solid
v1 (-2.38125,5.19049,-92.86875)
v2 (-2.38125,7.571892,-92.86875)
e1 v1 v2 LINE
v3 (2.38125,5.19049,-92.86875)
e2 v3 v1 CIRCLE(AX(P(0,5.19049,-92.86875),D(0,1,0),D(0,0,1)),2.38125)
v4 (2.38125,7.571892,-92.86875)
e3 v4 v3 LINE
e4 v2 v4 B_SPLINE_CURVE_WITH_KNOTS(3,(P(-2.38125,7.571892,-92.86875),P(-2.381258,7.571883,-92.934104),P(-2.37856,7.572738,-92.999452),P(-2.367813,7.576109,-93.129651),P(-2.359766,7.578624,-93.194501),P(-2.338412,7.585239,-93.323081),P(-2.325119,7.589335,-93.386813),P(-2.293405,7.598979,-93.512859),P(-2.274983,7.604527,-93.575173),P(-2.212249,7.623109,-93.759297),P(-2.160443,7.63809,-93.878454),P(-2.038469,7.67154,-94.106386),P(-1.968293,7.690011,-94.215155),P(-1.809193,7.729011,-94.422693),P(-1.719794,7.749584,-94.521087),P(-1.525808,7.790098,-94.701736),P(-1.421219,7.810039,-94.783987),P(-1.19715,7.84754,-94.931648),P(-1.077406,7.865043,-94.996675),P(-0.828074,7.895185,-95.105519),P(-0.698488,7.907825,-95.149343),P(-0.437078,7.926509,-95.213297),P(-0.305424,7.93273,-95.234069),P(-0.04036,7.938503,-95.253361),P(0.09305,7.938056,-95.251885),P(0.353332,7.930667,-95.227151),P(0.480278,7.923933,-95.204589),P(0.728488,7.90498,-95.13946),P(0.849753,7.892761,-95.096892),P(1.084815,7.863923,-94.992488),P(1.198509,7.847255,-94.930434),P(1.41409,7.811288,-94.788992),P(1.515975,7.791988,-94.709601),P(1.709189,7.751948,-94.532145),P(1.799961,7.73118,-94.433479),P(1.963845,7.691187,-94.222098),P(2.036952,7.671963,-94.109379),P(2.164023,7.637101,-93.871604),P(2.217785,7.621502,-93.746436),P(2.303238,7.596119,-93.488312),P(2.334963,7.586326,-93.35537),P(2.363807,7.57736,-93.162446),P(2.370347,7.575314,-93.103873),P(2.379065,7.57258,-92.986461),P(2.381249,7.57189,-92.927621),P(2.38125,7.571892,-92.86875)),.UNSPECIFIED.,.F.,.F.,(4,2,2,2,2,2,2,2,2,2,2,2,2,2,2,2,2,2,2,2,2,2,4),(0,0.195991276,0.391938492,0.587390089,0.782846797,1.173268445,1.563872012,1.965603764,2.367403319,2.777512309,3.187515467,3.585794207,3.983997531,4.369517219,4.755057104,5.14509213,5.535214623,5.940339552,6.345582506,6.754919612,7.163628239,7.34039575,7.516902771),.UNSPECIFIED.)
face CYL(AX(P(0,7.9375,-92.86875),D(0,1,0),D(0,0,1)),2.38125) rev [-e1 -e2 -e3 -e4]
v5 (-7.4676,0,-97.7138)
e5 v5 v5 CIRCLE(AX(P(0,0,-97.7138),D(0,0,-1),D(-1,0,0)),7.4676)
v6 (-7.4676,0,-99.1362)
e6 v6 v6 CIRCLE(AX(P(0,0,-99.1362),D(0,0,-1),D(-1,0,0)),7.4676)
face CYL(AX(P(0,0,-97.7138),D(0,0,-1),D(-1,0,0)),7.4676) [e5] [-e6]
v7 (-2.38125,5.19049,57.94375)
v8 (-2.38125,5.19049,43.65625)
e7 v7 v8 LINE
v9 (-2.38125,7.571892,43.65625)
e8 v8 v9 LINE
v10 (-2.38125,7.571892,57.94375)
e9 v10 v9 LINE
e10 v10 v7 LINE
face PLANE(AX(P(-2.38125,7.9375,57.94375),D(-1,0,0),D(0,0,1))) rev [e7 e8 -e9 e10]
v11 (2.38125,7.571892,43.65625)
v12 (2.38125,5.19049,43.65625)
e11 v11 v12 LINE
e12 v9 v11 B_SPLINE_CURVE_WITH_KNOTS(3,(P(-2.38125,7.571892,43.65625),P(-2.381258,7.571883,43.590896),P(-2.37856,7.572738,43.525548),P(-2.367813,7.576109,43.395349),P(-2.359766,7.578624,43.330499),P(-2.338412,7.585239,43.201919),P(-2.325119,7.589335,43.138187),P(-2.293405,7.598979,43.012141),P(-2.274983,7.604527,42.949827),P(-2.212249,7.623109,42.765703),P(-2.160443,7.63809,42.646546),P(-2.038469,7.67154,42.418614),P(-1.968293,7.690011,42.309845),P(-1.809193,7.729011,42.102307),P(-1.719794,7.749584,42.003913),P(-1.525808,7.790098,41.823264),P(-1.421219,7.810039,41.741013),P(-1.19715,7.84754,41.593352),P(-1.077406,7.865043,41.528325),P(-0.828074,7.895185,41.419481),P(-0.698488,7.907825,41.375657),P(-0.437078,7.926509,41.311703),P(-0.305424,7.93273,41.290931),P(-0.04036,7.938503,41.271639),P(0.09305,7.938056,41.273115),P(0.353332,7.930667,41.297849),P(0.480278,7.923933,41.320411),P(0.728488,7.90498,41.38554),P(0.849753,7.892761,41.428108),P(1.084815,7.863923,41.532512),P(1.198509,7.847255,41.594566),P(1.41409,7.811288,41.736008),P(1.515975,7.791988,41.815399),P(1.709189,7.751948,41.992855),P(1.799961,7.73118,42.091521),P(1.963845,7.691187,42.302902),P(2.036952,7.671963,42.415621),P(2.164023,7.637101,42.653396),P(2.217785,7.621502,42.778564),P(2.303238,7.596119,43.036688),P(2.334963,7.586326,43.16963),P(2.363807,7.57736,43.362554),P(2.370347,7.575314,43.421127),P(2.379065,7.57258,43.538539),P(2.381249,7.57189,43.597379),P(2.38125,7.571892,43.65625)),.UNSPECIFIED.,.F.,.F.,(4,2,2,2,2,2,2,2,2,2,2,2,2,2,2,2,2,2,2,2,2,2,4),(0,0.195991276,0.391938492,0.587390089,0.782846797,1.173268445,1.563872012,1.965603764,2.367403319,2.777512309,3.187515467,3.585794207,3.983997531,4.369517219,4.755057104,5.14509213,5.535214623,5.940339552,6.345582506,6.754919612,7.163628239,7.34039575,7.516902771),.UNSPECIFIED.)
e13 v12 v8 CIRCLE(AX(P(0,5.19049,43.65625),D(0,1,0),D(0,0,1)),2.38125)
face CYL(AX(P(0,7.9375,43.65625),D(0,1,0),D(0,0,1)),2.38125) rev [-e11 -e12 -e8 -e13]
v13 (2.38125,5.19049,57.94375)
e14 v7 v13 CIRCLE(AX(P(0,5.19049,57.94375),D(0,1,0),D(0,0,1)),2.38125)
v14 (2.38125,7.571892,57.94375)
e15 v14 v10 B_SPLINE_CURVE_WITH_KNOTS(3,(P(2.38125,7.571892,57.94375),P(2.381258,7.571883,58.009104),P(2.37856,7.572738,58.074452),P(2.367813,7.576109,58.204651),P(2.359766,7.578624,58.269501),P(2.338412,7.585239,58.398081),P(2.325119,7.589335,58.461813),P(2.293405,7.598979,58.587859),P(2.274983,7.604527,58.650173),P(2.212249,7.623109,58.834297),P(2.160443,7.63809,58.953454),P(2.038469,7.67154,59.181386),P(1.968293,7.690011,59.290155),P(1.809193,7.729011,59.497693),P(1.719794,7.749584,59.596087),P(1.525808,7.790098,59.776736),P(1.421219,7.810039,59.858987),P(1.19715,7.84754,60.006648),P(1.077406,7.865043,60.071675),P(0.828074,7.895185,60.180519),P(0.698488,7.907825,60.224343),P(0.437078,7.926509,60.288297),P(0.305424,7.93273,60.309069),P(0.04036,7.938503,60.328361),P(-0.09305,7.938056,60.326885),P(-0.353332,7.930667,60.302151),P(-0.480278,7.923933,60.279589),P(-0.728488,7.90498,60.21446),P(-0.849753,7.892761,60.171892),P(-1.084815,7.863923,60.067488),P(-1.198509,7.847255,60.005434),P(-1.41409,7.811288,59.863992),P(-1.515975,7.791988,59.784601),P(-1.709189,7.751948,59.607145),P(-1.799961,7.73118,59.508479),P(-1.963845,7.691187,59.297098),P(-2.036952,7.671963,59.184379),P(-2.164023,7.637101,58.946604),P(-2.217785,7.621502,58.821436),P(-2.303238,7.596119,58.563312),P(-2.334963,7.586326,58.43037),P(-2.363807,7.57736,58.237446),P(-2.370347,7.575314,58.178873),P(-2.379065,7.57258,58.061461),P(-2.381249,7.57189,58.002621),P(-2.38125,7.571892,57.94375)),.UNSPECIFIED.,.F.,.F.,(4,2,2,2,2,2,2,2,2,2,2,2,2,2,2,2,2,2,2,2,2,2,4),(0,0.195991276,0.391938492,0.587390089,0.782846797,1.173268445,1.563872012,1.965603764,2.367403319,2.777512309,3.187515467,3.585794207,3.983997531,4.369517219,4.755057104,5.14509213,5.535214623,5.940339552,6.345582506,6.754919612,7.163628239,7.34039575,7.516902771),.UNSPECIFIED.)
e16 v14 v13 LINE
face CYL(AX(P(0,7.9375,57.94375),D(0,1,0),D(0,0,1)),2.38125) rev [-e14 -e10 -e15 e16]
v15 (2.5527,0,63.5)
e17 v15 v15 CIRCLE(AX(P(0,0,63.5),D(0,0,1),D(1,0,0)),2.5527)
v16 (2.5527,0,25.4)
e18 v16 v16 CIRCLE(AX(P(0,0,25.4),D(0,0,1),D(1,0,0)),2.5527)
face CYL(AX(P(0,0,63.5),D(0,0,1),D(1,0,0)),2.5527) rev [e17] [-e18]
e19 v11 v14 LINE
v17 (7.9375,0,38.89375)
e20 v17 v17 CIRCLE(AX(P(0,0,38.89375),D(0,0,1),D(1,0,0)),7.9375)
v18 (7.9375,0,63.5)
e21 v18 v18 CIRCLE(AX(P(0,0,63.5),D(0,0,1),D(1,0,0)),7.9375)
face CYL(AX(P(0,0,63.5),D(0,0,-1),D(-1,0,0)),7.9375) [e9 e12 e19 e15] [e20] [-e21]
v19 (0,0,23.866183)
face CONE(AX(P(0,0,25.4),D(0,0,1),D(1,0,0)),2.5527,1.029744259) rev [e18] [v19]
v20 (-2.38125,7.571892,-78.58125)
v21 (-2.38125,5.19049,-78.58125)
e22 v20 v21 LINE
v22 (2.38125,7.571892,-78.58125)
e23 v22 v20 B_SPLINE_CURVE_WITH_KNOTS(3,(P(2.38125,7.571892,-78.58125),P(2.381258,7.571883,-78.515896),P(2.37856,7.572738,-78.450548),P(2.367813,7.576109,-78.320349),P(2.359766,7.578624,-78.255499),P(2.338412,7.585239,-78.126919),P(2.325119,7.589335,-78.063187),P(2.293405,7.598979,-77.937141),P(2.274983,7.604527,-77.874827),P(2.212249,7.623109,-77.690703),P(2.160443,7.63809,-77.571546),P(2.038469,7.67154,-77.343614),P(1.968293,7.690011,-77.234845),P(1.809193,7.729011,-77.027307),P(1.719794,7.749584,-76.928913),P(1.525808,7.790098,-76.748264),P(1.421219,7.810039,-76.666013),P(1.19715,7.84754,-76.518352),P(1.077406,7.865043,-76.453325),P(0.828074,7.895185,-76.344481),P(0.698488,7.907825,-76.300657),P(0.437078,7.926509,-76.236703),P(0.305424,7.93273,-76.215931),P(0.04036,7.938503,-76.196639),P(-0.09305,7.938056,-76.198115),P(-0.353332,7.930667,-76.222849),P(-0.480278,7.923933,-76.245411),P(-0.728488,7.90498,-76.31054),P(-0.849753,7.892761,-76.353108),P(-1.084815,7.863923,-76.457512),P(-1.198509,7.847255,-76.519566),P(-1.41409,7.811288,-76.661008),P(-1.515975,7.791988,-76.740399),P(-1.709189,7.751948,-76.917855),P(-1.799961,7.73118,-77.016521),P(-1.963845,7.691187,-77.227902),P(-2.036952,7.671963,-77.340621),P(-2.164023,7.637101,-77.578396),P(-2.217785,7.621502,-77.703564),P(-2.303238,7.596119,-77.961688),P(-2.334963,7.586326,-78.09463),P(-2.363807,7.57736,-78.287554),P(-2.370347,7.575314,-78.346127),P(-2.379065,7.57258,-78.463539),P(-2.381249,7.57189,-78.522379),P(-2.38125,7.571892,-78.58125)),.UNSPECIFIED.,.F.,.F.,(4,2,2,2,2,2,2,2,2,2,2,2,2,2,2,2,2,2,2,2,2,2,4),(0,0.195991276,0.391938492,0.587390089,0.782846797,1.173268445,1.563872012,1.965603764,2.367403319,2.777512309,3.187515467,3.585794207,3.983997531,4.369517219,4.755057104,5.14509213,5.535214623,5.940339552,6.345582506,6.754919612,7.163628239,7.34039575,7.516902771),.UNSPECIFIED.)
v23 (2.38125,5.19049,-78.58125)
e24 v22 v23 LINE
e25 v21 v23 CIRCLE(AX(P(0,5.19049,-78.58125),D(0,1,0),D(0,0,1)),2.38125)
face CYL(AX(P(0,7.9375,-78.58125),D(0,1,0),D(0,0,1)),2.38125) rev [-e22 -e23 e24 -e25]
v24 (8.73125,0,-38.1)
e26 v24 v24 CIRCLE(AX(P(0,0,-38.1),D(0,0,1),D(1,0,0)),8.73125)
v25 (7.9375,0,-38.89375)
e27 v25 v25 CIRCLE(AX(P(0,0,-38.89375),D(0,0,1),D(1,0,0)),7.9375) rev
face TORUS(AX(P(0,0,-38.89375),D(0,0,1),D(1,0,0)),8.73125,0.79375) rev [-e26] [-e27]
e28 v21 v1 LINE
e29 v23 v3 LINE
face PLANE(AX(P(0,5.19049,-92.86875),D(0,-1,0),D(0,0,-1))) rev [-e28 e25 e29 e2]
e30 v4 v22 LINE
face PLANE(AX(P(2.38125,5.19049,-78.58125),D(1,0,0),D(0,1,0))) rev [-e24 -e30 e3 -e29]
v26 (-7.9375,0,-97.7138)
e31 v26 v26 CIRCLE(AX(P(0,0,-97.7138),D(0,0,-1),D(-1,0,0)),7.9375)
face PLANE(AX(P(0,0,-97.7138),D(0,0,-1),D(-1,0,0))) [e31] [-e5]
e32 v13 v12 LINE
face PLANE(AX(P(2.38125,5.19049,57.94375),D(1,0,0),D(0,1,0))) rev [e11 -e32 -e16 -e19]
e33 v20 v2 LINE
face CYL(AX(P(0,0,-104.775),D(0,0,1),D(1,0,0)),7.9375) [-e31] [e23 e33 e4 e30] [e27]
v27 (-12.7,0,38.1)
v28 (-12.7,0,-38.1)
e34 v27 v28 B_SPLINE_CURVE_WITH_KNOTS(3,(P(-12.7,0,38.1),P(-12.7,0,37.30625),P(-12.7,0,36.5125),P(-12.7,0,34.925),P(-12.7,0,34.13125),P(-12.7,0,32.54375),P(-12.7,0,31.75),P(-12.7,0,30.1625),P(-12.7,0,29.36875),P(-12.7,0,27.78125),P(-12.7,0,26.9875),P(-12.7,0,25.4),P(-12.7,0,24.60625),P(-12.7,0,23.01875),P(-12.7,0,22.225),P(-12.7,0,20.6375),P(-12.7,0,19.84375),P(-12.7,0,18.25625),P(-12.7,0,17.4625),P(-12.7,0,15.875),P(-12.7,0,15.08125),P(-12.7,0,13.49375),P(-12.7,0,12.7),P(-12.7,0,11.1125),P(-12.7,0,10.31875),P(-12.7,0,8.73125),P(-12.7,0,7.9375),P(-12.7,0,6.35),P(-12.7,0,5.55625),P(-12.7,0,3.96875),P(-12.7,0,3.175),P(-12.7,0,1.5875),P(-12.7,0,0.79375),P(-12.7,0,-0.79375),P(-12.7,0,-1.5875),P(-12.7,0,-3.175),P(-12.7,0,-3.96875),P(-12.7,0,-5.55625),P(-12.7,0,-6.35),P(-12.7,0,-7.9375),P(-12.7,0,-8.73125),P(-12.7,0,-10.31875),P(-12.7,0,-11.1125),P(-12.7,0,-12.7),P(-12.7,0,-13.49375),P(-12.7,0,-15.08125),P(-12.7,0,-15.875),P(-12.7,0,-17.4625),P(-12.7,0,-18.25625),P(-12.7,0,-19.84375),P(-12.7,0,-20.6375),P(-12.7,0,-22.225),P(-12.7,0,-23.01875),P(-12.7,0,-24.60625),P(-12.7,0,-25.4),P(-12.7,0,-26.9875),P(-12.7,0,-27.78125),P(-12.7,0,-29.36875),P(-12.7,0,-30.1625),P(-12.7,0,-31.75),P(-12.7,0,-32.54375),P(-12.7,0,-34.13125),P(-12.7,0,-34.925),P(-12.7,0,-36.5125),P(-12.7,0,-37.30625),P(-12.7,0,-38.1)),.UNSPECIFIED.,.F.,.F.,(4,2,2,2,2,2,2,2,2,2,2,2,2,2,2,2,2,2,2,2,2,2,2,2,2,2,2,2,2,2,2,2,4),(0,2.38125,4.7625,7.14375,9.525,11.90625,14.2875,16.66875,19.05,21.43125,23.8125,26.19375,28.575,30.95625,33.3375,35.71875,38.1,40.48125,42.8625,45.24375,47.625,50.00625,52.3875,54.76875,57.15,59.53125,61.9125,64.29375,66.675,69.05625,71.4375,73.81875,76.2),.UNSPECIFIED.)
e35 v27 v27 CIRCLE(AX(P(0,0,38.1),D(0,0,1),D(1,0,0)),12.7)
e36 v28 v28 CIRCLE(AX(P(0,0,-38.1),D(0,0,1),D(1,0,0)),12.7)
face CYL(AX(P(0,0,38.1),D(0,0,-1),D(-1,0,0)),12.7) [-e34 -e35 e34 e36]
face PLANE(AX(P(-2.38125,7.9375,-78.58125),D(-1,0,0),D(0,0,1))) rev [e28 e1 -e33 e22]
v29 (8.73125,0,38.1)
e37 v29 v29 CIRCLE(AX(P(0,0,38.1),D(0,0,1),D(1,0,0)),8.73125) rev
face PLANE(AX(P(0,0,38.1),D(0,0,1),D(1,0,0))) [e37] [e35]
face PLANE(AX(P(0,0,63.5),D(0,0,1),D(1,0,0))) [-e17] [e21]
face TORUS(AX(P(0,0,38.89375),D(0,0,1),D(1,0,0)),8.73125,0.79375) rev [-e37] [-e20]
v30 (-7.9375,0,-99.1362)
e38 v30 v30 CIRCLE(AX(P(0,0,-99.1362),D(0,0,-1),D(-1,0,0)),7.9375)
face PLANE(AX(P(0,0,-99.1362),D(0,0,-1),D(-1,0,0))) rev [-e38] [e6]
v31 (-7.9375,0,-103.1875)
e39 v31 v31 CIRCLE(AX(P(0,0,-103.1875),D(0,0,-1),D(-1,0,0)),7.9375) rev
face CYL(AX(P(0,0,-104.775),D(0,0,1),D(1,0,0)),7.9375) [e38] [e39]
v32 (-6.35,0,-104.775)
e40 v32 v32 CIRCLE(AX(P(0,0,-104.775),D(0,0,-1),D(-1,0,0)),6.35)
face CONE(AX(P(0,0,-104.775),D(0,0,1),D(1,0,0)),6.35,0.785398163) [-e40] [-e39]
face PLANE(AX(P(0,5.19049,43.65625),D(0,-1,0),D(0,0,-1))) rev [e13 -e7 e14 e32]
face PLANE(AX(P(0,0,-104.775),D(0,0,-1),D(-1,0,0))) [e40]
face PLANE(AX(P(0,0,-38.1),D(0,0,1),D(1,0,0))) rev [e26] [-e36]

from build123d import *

# Parameters (mm, degrees)
SKETCH1_R                          = 12.7
BOSS_EXTRUDE1_DEPTH                = 38.1
SKETCH3_R                          = 7.9375
BOSS_EXTRUDE2_DEPTH                = 66.675
SKETCH8_R                          = 12.7
SKETCH8_R_2                        = 7.4676
CUT_EXTRUDE1_DEPTH                 = 0.7112
BOSS_EXTRUDE3_START                = 25.4
SKETCH9_R                          = 7.9375
BOSS_EXTRUDE3_DEPTH                = 25.4
FILLET1_R                          = 0.79375
F_1_4_20_TAPPED_HOLE1_D            = 5.1054
F_1_4_20_TAPPED_HOLE1_DEPTH        = 38.1
F_1_4_20_TAPPED_HOLE1_TIP          = 1.533816902
F_3_16_START                       = 5.19049
F_3_16_0_1875_DIAMETER_SLOT1_DEPTH = 3.80951
CHAMFER1_SIZE                      = 1.5875


with BuildPart() as part:
    # Sketch1 → Boss-Extrude1 (new, symmetric)
    with BuildSketch(Plane.XY):
        with Locations(Location((0, 0, 0), (0, 0, 180))):
            Circle(SKETCH1_R)
    extrude(amount=BOSS_EXTRUDE1_DEPTH, both=True)

    # Sketch3 → Boss-Extrude2 (add)
    with BuildSketch(Plane(origin=(0, 0, -38.1), x_dir=(-1, 0, 0), z_dir=(0, 0, -1))):
        with Locations(Location((0, 0, 0), (0, 0, 180))):
            Circle(SKETCH3_R)
    extrude(amount=BOSS_EXTRUDE2_DEPTH)

    # Sketch8 → Cut-Extrude1 (cut, symmetric)
    with BuildSketch(Plane(origin=(0, 0, -98.425), x_dir=(-1, 0, 0), z_dir=(0, 0, -1))):
        Circle(SKETCH8_R)
        Circle(SKETCH8_R_2, mode=Mode.SUBTRACT)
    extrude(amount=CUT_EXTRUDE1_DEPTH, both=True, mode=Mode.SUBTRACT)

    # Sketch9 → Boss-Extrude3 (add)
    with BuildSketch(Plane.XY.offset(38.1).offset(BOSS_EXTRUDE3_START)):
        Circle(SKETCH9_R)
    extrude(amount=-BOSS_EXTRUDE3_DEPTH)

    # Fillet1
    fillet1_edges = [part.edges().sort_by_distance(p)[0] for p in [
        (-7.9375, 0, 38.1),
        (-7.9375, 0, -38.1),
    ]]
    fillet(fillet1_edges, radius=FILLET1_R)

    # 1/4-20 Tapped Hole1
    with Locations(Plane.XY.offset(63.5)):
        with Locations((0, 0)):
            Hole(F_1_4_20_TAPPED_HOLE1_D / 2, depth=F_1_4_20_TAPPED_HOLE1_DEPTH)
            with Locations((0, 0, -(F_1_4_20_TAPPED_HOLE1_DEPTH + F_1_4_20_TAPPED_HOLE1_TIP / 2))):  # 118° drill point
                Cone(0, F_1_4_20_TAPPED_HOLE1_D / 2, F_1_4_20_TAPPED_HOLE1_TIP, mode=Mode.SUBTRACT)

    # 3/16 (0.1875) Diameter Slot1: read off the stored shape, not the designer's step
    # 3/16 (0.1875) Diameter Slot1 outline → 3/16 (0.1875) Diameter Slot1 (cut)
    with BuildSketch(Plane(origin=(0, 0, 0), x_dir=(1, 0, 0), z_dir=(0, 1, 0)).offset(F_3_16_START)):
        with BuildLine():
            ThreePointArc((2.38125, -43.65625), (0, -41.275), (-2.38125, -43.65625))
            Line((-2.38125, -43.65625), (-2.38125, -57.94375))
            ThreePointArc((-2.38125, -57.94375), (0, -60.325), (2.38125, -57.94375))
            Line((2.38125, -57.94375), (2.38125, -43.65625))
        make_face()
        with BuildLine():
            ThreePointArc((2.38125, 92.86875), (0, 95.25), (-2.38125, 92.86875))
            Line((-2.38125, 92.86875), (-2.38125, 78.58125))
            ThreePointArc((-2.38125, 78.58125), (0, 76.2), (2.38125, 78.58125))
            Line((2.38125, 78.58125), (2.38125, 92.86875))
        make_face()
    extrude(amount=F_3_16_0_1875_DIAMETER_SLOT1_DEPTH, mode=Mode.SUBTRACT)

    # Chamfer1
    chamfer1_edges = [part.edges().sort_by_distance(p)[0] for p in [
        (-7.9375, 0, -104.775),
    ]]
    chamfer(chamfer1_edges, length=CHAMFER1_SIZE)


solid = part.part
